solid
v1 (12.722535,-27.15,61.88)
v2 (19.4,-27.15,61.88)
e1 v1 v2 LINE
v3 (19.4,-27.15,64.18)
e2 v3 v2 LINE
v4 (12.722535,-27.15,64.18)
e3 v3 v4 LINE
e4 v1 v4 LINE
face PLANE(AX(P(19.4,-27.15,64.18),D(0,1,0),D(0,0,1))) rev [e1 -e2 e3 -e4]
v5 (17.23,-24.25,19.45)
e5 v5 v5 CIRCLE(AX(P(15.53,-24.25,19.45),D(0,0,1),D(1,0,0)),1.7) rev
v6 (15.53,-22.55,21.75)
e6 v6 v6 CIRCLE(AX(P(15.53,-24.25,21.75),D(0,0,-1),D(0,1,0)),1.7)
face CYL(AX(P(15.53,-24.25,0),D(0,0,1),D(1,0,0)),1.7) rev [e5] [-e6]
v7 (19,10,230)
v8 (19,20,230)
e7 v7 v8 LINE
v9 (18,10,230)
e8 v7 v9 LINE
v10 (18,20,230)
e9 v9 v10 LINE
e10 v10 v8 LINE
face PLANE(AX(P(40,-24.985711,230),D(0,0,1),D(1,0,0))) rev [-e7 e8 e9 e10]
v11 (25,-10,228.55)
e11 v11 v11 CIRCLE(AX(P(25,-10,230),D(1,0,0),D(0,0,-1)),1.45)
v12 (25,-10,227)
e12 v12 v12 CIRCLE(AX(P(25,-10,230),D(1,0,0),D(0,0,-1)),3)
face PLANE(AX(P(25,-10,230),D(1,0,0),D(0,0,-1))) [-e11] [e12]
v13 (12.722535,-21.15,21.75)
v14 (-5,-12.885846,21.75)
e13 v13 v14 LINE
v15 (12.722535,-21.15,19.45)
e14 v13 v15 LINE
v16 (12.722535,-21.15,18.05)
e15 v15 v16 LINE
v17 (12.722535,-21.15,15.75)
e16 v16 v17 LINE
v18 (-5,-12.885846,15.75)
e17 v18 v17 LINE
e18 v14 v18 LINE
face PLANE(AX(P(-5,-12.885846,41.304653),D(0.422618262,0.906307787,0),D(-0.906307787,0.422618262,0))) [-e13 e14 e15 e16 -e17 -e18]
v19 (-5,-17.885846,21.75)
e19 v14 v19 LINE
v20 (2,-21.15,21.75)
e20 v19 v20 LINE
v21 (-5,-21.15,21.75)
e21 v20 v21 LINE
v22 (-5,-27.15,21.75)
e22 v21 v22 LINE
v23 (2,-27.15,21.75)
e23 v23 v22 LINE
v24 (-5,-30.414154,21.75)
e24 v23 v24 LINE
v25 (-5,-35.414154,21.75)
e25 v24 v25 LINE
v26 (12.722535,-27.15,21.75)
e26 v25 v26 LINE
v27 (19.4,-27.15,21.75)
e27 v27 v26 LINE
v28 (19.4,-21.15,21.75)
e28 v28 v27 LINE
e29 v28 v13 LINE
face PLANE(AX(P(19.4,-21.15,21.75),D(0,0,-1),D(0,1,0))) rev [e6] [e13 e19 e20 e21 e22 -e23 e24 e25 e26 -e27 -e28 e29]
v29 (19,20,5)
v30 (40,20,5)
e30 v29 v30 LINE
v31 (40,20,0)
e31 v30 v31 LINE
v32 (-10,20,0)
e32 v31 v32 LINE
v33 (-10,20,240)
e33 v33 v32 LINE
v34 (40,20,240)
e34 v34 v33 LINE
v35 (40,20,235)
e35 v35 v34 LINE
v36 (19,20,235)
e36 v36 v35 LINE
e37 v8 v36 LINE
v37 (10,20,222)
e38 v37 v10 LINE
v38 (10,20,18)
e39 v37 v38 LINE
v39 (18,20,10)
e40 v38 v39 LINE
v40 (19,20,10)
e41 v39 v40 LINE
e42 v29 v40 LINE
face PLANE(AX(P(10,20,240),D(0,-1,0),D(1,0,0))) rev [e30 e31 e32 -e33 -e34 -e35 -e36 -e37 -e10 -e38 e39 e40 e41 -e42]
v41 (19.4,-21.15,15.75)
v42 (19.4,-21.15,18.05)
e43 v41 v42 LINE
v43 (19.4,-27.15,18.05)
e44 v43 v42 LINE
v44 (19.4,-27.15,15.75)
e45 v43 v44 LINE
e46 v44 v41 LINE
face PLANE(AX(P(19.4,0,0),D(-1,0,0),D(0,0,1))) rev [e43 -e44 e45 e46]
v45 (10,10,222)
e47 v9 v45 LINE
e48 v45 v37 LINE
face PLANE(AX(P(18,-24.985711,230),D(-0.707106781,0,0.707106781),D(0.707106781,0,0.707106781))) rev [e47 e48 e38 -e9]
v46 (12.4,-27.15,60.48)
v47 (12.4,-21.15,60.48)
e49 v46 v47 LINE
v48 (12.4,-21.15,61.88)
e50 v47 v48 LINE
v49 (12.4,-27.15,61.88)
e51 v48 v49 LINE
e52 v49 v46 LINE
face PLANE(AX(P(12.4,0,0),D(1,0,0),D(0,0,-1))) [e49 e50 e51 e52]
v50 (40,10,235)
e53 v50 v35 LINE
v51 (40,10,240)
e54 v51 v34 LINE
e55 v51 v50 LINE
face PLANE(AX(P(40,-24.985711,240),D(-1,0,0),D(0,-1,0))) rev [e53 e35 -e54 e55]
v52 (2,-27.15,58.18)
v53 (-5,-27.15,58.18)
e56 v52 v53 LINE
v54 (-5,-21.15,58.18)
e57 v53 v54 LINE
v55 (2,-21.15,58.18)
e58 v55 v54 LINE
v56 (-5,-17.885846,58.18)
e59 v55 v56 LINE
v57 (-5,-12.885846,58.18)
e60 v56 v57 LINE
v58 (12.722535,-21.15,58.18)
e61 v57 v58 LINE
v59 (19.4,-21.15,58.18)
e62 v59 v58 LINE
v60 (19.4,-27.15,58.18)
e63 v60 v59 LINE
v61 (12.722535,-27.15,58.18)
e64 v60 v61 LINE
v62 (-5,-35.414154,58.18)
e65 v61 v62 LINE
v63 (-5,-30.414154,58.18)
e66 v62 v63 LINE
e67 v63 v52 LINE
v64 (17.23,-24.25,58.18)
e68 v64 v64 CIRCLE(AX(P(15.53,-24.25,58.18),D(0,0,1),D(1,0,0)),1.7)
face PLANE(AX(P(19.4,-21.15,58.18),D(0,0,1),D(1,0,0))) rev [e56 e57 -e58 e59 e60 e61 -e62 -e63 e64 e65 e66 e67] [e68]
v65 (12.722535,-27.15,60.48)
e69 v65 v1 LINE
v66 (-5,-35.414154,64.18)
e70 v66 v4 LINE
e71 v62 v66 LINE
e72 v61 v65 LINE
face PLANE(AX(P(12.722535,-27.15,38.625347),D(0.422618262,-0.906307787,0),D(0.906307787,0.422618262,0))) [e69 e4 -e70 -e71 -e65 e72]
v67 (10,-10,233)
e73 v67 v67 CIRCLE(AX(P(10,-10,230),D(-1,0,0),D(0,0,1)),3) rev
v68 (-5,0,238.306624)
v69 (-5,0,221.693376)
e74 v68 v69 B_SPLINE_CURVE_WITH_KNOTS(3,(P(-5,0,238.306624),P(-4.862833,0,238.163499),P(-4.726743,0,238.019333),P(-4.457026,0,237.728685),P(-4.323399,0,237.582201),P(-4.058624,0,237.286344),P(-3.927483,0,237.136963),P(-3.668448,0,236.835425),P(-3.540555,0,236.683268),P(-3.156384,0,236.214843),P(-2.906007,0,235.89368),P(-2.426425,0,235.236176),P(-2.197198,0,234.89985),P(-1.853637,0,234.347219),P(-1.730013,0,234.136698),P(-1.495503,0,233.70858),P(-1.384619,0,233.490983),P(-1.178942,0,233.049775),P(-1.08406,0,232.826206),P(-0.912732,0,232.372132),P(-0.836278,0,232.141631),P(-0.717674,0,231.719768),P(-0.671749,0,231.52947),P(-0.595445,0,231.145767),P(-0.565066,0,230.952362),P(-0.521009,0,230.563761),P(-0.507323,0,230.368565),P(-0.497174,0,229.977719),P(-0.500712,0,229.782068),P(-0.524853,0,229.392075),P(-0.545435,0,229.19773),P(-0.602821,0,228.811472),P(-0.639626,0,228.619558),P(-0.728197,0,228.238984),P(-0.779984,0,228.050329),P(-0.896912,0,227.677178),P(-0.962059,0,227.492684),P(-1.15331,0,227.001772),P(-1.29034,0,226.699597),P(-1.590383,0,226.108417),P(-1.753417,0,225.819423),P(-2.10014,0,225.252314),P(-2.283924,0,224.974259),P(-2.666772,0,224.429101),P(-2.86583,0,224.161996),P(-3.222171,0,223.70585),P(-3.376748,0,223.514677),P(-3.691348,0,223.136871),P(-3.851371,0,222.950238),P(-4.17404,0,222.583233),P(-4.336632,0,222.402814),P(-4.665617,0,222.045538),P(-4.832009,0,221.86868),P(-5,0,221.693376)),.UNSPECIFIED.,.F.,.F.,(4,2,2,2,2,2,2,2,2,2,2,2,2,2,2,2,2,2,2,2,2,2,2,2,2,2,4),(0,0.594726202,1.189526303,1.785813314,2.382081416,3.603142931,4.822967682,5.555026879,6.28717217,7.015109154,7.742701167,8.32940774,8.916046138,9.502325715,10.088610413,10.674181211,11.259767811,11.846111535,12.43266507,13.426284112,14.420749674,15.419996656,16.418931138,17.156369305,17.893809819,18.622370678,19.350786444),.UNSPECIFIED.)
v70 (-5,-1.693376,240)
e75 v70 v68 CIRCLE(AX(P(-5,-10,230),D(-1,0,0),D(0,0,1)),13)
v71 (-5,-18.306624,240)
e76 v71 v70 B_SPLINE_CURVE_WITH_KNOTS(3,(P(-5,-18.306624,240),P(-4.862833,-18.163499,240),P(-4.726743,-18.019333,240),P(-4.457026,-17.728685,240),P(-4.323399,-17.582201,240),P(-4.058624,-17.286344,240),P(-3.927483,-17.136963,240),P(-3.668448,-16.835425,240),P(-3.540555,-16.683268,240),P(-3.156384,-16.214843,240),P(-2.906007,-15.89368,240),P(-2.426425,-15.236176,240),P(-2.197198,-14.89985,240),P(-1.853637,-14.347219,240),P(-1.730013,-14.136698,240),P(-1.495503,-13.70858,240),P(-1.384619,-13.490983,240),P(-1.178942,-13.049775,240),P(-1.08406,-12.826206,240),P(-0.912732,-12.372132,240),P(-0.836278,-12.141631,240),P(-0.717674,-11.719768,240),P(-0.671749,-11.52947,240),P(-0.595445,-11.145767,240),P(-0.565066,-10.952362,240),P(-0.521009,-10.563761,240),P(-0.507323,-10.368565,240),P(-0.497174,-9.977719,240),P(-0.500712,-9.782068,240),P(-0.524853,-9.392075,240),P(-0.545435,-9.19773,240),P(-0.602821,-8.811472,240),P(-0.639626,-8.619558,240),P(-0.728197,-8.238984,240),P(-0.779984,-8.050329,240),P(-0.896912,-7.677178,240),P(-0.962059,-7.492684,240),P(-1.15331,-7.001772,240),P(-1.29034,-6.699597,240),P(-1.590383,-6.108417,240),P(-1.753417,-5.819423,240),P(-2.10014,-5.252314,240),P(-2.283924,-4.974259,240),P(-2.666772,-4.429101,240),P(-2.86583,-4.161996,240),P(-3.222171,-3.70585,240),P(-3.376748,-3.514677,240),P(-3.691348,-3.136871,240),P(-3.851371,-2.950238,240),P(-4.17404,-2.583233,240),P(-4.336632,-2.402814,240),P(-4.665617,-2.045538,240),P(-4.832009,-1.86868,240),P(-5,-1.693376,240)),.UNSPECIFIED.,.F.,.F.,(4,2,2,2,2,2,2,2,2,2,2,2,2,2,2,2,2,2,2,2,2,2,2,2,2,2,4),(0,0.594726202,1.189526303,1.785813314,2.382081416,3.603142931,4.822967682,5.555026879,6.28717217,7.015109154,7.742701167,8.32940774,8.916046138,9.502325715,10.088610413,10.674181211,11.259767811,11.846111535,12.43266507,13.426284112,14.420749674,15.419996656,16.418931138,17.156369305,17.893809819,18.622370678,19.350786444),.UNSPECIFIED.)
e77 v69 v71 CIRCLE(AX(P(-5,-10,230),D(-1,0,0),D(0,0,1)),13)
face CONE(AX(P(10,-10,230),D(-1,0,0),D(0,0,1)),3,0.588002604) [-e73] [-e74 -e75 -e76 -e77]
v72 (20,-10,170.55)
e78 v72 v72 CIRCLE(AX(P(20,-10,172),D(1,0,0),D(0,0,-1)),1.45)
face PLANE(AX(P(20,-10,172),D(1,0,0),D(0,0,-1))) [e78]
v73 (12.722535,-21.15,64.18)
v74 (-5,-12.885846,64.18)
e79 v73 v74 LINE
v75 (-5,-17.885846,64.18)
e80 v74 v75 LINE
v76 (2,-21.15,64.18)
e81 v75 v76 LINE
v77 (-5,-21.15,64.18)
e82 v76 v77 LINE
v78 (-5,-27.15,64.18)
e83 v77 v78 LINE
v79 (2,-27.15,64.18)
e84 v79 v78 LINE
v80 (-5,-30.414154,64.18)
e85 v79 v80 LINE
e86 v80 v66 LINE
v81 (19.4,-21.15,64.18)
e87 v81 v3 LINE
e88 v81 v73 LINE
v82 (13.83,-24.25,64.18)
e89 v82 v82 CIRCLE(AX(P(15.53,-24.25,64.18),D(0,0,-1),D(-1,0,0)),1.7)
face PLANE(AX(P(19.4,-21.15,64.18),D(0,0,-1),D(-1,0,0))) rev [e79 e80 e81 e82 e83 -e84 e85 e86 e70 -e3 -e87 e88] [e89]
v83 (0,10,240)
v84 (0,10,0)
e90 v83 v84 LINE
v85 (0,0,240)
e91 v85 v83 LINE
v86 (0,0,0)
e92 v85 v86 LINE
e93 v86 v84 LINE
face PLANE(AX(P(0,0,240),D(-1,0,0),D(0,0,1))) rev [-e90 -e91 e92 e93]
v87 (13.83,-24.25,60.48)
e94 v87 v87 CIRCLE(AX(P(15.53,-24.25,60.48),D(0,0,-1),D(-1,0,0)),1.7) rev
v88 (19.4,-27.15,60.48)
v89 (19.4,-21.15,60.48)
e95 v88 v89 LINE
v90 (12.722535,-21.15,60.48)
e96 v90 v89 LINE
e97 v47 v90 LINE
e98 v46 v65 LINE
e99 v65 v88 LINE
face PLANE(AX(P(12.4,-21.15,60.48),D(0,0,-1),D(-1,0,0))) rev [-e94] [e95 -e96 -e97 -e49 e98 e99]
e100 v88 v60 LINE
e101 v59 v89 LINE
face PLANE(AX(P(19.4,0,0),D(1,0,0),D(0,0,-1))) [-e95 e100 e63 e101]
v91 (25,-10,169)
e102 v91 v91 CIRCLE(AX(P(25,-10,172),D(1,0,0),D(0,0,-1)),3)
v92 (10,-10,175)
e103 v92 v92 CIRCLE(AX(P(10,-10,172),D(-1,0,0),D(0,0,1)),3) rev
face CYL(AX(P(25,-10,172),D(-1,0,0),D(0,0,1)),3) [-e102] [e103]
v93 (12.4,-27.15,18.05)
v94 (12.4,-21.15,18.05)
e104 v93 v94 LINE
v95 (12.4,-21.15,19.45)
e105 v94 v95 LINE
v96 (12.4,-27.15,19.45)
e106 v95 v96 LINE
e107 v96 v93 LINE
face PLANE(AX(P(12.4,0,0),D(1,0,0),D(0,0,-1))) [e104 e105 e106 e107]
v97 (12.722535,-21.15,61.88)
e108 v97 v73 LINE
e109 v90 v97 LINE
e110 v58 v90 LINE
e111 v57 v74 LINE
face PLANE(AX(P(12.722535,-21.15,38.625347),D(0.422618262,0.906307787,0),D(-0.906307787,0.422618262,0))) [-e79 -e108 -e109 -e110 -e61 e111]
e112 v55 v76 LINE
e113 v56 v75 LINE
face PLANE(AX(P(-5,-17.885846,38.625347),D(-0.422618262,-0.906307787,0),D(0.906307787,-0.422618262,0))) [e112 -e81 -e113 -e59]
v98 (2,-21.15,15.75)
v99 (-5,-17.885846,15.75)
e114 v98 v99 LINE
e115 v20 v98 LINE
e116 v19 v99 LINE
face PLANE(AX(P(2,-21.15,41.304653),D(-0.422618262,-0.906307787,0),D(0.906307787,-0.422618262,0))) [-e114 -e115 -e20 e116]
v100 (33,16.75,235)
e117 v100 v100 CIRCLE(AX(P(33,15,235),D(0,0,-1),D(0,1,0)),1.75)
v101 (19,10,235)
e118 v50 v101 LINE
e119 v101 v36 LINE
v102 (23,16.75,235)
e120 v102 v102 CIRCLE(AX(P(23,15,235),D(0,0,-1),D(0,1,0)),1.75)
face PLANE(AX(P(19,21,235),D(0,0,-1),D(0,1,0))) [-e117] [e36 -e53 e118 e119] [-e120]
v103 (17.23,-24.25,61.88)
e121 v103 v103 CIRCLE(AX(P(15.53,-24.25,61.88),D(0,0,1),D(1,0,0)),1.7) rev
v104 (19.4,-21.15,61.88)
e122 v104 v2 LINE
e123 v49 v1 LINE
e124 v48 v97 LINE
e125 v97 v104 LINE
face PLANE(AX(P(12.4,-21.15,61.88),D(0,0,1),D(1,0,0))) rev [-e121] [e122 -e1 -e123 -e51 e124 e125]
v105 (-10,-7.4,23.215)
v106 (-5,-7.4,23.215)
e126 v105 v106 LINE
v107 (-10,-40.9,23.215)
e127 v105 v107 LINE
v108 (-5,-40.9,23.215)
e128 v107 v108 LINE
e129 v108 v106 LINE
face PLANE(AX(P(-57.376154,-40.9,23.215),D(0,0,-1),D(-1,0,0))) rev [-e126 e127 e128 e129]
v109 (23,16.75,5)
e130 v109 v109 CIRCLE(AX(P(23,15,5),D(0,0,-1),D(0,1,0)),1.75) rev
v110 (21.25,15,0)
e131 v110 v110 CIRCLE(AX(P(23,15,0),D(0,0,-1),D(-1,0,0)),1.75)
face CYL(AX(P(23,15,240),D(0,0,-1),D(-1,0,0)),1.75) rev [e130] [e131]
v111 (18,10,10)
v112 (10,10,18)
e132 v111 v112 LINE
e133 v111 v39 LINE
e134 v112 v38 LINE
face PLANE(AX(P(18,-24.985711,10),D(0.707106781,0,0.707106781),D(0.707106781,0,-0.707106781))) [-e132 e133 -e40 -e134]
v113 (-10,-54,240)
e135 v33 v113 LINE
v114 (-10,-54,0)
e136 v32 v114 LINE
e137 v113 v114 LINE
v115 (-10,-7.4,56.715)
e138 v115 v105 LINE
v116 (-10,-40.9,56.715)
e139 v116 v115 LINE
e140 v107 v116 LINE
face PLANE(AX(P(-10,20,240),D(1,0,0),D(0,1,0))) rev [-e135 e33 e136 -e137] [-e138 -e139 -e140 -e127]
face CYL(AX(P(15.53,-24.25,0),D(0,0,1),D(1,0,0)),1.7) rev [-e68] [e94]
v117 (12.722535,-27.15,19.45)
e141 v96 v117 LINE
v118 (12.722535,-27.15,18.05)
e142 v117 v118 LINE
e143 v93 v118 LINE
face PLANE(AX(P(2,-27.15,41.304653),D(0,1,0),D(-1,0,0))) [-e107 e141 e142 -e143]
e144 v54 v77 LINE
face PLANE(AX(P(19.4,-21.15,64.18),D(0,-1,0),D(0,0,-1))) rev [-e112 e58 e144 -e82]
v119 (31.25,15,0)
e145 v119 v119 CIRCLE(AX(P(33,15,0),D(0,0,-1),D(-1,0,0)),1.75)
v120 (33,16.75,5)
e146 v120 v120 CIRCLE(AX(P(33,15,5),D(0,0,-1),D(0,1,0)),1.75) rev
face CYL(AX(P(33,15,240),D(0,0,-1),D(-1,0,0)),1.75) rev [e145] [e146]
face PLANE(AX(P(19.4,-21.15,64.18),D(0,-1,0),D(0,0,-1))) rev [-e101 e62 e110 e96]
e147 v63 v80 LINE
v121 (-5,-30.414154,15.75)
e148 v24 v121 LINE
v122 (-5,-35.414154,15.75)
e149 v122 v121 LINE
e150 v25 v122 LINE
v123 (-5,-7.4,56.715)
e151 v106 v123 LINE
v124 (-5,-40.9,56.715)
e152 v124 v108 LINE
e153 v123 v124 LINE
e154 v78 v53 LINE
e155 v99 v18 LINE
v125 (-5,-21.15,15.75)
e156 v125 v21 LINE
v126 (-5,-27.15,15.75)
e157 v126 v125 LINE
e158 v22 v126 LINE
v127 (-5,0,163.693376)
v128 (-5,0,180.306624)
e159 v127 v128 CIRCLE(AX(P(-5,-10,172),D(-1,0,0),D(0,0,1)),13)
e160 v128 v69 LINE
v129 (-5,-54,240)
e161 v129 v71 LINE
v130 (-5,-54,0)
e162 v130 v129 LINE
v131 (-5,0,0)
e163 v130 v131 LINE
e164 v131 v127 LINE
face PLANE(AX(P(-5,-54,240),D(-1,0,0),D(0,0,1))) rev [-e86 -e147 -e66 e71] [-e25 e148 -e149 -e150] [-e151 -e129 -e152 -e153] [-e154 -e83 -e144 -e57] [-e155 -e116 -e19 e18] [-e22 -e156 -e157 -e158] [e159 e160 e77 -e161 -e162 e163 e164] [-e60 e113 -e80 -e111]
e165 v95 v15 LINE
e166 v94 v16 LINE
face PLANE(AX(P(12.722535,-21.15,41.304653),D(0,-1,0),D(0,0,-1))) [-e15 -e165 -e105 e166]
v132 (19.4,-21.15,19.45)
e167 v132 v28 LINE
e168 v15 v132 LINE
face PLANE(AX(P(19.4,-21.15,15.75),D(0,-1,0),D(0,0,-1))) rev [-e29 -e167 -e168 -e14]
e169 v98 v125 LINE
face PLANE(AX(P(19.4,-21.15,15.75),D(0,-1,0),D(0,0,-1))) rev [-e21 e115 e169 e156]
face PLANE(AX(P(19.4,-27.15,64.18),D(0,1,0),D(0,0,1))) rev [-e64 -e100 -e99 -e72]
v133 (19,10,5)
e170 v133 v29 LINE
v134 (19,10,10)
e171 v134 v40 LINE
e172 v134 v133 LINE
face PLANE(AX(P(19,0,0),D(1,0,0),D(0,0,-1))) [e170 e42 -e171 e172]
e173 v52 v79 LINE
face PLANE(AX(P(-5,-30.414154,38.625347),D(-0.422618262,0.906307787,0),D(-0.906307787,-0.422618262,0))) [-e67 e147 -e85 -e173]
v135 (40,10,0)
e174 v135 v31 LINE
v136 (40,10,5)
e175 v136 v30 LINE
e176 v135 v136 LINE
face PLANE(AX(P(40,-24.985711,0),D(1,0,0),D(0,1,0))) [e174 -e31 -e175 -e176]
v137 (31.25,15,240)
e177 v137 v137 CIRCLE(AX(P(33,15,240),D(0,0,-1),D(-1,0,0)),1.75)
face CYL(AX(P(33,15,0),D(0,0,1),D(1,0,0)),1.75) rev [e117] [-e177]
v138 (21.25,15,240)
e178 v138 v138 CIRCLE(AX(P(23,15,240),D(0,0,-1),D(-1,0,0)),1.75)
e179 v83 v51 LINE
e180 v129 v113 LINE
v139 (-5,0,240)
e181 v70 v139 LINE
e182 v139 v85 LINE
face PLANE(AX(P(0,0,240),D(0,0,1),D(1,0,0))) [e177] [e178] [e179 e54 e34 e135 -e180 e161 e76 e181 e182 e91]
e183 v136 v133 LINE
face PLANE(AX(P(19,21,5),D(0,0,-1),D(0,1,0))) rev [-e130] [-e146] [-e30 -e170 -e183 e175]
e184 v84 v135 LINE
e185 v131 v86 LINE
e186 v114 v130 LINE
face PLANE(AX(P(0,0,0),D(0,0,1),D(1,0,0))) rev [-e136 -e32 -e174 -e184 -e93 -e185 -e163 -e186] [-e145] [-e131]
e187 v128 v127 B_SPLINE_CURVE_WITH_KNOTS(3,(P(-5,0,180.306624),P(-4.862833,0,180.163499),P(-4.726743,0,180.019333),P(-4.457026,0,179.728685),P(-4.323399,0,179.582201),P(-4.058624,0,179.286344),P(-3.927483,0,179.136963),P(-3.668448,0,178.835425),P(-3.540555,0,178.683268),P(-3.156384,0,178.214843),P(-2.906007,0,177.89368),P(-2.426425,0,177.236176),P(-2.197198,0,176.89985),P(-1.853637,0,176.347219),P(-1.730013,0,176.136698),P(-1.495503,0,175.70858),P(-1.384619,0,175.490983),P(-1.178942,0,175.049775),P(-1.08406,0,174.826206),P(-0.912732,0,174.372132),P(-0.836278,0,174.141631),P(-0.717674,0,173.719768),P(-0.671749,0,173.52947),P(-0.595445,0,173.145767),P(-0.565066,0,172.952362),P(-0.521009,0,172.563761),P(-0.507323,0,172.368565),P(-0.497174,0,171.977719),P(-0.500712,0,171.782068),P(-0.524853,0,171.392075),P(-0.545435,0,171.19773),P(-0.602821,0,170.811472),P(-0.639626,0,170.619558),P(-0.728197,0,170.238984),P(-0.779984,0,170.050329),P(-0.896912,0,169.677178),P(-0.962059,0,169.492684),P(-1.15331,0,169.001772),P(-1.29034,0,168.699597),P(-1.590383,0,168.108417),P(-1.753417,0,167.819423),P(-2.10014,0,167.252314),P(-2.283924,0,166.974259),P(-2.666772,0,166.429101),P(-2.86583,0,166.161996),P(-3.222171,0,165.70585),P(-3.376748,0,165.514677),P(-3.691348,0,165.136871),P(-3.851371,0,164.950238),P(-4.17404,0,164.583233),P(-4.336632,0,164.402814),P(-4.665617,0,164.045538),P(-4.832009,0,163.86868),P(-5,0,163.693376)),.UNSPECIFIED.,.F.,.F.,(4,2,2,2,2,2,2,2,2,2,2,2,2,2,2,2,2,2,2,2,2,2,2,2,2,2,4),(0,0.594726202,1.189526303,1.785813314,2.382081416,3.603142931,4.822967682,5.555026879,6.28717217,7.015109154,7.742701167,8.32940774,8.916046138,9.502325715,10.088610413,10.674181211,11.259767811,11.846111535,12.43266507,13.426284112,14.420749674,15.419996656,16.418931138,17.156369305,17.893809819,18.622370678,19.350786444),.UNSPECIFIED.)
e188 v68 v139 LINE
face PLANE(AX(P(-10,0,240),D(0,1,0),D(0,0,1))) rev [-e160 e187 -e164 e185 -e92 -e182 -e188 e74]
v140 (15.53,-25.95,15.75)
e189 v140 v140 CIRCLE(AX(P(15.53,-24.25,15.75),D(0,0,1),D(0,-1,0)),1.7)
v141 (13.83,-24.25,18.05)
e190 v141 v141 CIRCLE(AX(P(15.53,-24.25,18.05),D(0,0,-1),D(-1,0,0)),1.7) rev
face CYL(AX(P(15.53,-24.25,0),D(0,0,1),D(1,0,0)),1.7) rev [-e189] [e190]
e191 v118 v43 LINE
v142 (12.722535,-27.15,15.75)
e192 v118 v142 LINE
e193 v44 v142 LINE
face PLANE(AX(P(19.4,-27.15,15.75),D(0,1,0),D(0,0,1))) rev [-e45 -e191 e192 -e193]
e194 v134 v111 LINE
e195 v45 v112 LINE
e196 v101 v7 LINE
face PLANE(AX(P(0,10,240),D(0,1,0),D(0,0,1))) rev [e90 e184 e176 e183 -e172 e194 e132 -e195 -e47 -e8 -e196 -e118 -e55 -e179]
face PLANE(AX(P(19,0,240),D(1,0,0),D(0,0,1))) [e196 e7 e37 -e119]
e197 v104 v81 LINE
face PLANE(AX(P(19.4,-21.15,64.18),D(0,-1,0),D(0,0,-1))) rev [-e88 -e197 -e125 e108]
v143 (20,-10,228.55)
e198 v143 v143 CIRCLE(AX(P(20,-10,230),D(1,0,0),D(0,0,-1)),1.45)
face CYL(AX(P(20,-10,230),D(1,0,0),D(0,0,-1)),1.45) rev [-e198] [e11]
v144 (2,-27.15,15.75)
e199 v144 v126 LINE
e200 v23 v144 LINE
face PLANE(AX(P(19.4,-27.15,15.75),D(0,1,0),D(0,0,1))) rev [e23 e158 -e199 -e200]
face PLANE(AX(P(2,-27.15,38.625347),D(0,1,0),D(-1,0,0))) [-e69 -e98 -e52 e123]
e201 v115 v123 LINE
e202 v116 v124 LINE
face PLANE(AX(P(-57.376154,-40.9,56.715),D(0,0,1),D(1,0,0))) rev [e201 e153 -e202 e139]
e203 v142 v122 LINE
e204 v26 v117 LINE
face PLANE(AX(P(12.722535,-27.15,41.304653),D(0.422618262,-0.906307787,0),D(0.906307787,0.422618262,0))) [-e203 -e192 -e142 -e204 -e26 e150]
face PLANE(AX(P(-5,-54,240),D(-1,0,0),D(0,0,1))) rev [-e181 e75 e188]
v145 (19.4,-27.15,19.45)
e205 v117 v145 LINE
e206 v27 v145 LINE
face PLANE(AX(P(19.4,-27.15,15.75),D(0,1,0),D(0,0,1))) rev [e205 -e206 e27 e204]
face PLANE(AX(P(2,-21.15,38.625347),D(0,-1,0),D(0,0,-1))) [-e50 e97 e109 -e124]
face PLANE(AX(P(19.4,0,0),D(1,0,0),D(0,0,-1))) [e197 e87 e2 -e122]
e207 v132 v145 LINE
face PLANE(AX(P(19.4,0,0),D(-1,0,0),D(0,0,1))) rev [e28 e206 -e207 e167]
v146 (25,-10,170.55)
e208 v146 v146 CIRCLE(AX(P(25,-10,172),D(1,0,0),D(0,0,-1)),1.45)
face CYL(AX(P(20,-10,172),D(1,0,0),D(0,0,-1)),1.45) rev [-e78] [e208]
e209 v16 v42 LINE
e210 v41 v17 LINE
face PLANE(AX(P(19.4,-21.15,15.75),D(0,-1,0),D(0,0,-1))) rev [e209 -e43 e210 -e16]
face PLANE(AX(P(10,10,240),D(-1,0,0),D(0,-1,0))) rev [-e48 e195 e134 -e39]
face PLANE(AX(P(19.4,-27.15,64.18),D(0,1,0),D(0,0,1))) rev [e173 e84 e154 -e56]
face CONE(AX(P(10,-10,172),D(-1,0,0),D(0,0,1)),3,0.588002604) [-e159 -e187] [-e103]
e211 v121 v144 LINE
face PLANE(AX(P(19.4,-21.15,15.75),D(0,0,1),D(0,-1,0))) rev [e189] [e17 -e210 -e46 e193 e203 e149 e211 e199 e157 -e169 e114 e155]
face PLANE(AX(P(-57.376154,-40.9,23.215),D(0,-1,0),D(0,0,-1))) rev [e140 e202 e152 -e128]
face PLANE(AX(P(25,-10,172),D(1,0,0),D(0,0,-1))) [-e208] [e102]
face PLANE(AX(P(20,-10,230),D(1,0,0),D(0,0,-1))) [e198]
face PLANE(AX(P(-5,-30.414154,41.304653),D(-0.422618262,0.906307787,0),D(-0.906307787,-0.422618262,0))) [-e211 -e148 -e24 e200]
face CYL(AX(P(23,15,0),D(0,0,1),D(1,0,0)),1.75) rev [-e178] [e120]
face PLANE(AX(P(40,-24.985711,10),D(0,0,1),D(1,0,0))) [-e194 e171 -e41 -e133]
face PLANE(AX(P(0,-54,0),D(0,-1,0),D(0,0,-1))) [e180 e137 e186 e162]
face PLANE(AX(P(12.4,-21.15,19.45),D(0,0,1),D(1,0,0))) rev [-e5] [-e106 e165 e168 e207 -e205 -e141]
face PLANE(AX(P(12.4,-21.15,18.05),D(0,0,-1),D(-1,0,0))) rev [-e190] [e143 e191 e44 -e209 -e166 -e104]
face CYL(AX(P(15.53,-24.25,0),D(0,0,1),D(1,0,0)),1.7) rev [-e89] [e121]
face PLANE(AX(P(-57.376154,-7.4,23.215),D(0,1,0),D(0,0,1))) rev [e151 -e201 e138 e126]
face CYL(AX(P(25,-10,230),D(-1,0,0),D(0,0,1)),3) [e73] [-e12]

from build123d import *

# Parameters (mm, degrees)
BOSS_EXTRUDE1_DEPTH     = 240
BOSS_EXTRUDE3_DEPTH     = 10
SKETCH5_R               = 1.75
CUT_EXTRUDE1_DEPTH      = 245.131112315
SKETCH6_W               = 7
SKETCH6_H               = 12
CUT_EXTRUDE2_DEPTH      = 21
SKETCH7_W               = 5
SKETCH7_H               = 240
BOSS_EXTRUDE4_DEPTH     = 54
SKETCH8_W               = 6
SKETCH8_H               = 6
BOSS_EXTRUDE5_DEPTH     = 24.4
CUT_EXTRUDE3_DEPTH      = 229.361692278
CUT_EXTRUDE3_DEPTH_BACK = 229.361692278
SKETCH9_R               = 1.7
SKETCH10_W              = 1.4
SKETCH10_H              = 6
CUT_EXTRUDE4_DEPTH      = 7
BOSS_EXTRUDE6_REACH     = 190.225
BOSS_EXTRUDE7_DEPTH     = 6
SKETCH13_R              = 3
BOSS_EXTRUDE8_DEPTH     = 30
SKETCH15_R              = 1.45
CUT_EXTRUDE5_DEPTH      = 5
SKETCH16_W              = 33.5
SKETCH16_H              = 33.5
CUT_EXTRUDE6_DEPTH      = 5
CHAMFER1_SIZE           = 10
CHAMFER1_SIZE_2         = 15


with BuildPart() as part:
    # Sketch1 → Boss-Extrude1 (new body)
    with BuildSketch(Plane.XY):
        Polygon((-10, 0), (0, 0), (0, 10), (10, 10), (10, 20), (-10, 20), align=None)
    extrude(amount=BOSS_EXTRUDE1_DEPTH)

    # Sketch4 → Boss-Extrude3 (add)
    with BuildSketch(Plane(origin=(0, 20, 0), x_dir=(1, 0, 0), z_dir=(0, 1, 0))):
        Polygon((10, 0), (40, 0), (40, -10), (18, -10), (10, -18), align=None)
    boss_extrude3 = extrude(amount=-BOSS_EXTRUDE3_DEPTH)

    # Sketch5 → Cut-Extrude1 (cut, through all)
    with BuildSketch(Plane(origin=(0, 0, 0), x_dir=(-1, 0, 0), z_dir=(0, 0, -1))):
        with Locations((-33, 15)):
            Circle(SKETCH5_R)
        with Locations((-23, 15)):
            Circle(SKETCH5_R)
    cut_extrude1 = extrude(amount=-CUT_EXTRUDE1_DEPTH, mode=Mode.SUBTRACT)

    # Sketch6 → Cut-Extrude2 (cut)
    with BuildSketch(Plane(origin=(40, 0, 0), x_dir=(0, 0, -1), z_dir=(1, 0, 0))):
        with Locations((-8.5, 15)):
            Rectangle(SKETCH6_W, SKETCH6_H)
    cut_extrude2 = extrude(amount=-CUT_EXTRUDE2_DEPTH, mode=Mode.SUBTRACT)

    # Mirror1: Boss-Extrude3, Cut-Extrude1, Cut-Extrude2 across plane
    add(boss_extrude3.mirror(Plane(origin=(0, 0, 120), x_dir=(1, 0, 0), z_dir=(0, 0, -1))))
    add(cut_extrude1.mirror(Plane(origin=(0, 0, 120), x_dir=(1, 0, 0), z_dir=(0, 0, -1))), mode=Mode.SUBTRACT)
    add(cut_extrude2.mirror(Plane(origin=(0, 0, 120), x_dir=(1, 0, 0), z_dir=(0, 0, -1))), mode=Mode.SUBTRACT)

    # Sketch7 → Boss-Extrude4 (add)
    with BuildSketch(Plane.XZ):
        with Locations((-7.5, 120)):
            Rectangle(SKETCH7_W, SKETCH7_H)
    extrude(amount=BOSS_EXTRUDE4_DEPTH)

    # Sketch8 → Boss-Extrude5 (add)
    with BuildSketch(Plane(origin=(-5, 0, 0), x_dir=(0, 0, -1), z_dir=(1, 0, 0))):
        with Locations((-18.75, -24.15)):
            Rectangle(SKETCH8_W, SKETCH8_H)
        with Locations((-61.18, -24.15)):
            Rectangle(SKETCH8_W, SKETCH8_H)
    extrude(amount=BOSS_EXTRUDE5_DEPTH)

    # Sketch9 → Cut-Extrude3 (cut, two sides: drawn at the far end of the back side and taken through both)
    with BuildSketch(Plane.XY.offset(21.75).offset(-CUT_EXTRUDE3_DEPTH_BACK)):
        with Locations((15.53, -24.25)):
            Circle(SKETCH9_R)
    extrude(amount=CUT_EXTRUDE3_DEPTH + CUT_EXTRUDE3_DEPTH_BACK, mode=Mode.SUBTRACT)

    # Sketch10 → Cut-Extrude4 (cut)
    with BuildSketch(Plane(origin=(19.4, 0, 0), x_dir=(0, 0, -1), z_dir=(1, 0, 0))):
        with Locations((-18.75, -24.15)):
            Rectangle(SKETCH10_W, SKETCH10_H)
        with Locations((-61.18, -24.15)):
            Rectangle(SKETCH10_W, SKETCH10_H)
    extrude(amount=-CUT_EXTRUDE4_DEPTH, mode=Mode.SUBTRACT)

    # Boss-Extrude6: up to this face of the body (flat: up to its plane)
    boss_extrude6_end = Plane(part.part.faces().sort_by_distance((6.649247597, -24.143388326, 58.18))[0])
    # Sketch11 → Boss-Extrude6 (add, up to the picked face)
    with BuildSketch(Plane.XY.offset(64.18), mode=Mode.PRIVATE) as boss_extrude6_sk1:
        Polygon((12.722534603, -21.15), (-5, -12.885846393), (-5, -17.885846393), (2, -21.15), align=None)
    boss_extrude6_tool1 = split(extrude(boss_extrude6_sk1.sketch, amount=-BOSS_EXTRUDE6_REACH, mode=Mode.PRIVATE), bisect_by=boss_extrude6_end, keep=Keep.BOTH, mode=Mode.PRIVATE)
    # Sketch11 → Boss-Extrude6 (add, up to the picked face)
    with BuildSketch(Plane.XY.offset(64.18), mode=Mode.PRIVATE) as boss_extrude6_sk2:
        Polygon((-5, -30.414153607), (2, -27.15), (12.722534603, -27.15), (-5, -35.414153607), align=None)
    boss_extrude6_tool2 = split(extrude(boss_extrude6_sk2.sketch, amount=-BOSS_EXTRUDE6_REACH, mode=Mode.PRIVATE), bisect_by=boss_extrude6_end, keep=Keep.BOTH, mode=Mode.PRIVATE)
    add(boss_extrude6_tool1.solids().sort_by(Axis((1.568177, -18.087209, 64.18), (0, 0, -1)))[0])
    add(boss_extrude6_tool2.solids().sort_by(Axis((1.568177, -30.212791, 64.18), (0, 0, -1)))[0])

    # Sketch12 → Boss-Extrude7 (add)
    with BuildSketch(Plane(origin=(0, 0, 15.75), x_dir=(-1, 0, 0), z_dir=(0, 0, -1))):
        Polygon((-12.722534603, -21.15), (-2, -21.15), (5, -17.885846393), (5, -12.885846393), align=None)
        Polygon((-2, -27.15), (-12.722534603, -27.15), (5, -35.414153607), (5, -30.414153607), align=None)
    extrude(amount=-BOSS_EXTRUDE7_DEPTH)

    # Sketch13 → Boss-Extrude8 (add)
    with BuildSketch(Plane(origin=(-5, 0, 0), x_dir=(0, 0, -1), z_dir=(1, 0, 0))):
        with Locations(Location((-230, -10, 0), (0, 0, 180))):
            Circle(SKETCH13_R)
        with Locations(Location((-172, -10, 0), (0, 0, 180))):
            Circle(SKETCH13_R)
    extrude(amount=BOSS_EXTRUDE8_DEPTH)

    # Sketch15 → Cut-Extrude5 (cut)
    with BuildSketch(Plane(origin=(25, 0, 0), x_dir=(0, 0, -1), z_dir=(1, 0, 0))):
        with Locations((-230, -10)):
            Circle(SKETCH15_R)
        with Locations((-172, -10)):
            Circle(SKETCH15_R)
    extrude(amount=-CUT_EXTRUDE5_DEPTH, mode=Mode.SUBTRACT)

    # Sketch16 → Cut-Extrude6 (cut)
    with BuildSketch(Plane(origin=(-5, 0, 0), x_dir=(0, 0, -1), z_dir=(1, 0, 0))):
        with Locations((-39.965, -24.15)):
            Rectangle(SKETCH16_W, SKETCH16_H)
    extrude(amount=-CUT_EXTRUDE6_DEPTH, mode=Mode.SUBTRACT)

    # Chamfer1
    # the kernel refuses this chamfer: 15, 10 mm, written as the material it adds along each edge
    with BuildSketch(Plane(origin=(-5, -10, 172), x_dir=(0, 0, 1), z_dir=(0, 1, 0))) as chamfer1_piece_1:
        Polygon((3 + CHAMFER1_SIZE, 0), (3, CHAMFER1_SIZE_2), (3, 0), align=None)
    revolve(axis=Axis((-5, -10, 172), (1, 0, 0)))
    with BuildSketch(Plane(origin=(-5, -10, 230), x_dir=(0, 0, 1), z_dir=(0, 1, 0))) as chamfer1_piece_2_section:
        Polygon((3 + CHAMFER1_SIZE, 0), (3, CHAMFER1_SIZE_2), (3, 0), align=None)
    chamfer1_piece_2 = revolve(axis=Axis((-5, -10, 230), (1, 0, 0)), mode=Mode.PRIVATE)
    chamfer1_piece_2 = split(chamfer1_piece_2, bisect_by=Plane(origin=(2.41807783, -10, 240), z_dir=(0, 0, -1)), keep=Keep.TOP, mode=Mode.PRIVATE)
    add(chamfer1_piece_2)


solid = part.part
